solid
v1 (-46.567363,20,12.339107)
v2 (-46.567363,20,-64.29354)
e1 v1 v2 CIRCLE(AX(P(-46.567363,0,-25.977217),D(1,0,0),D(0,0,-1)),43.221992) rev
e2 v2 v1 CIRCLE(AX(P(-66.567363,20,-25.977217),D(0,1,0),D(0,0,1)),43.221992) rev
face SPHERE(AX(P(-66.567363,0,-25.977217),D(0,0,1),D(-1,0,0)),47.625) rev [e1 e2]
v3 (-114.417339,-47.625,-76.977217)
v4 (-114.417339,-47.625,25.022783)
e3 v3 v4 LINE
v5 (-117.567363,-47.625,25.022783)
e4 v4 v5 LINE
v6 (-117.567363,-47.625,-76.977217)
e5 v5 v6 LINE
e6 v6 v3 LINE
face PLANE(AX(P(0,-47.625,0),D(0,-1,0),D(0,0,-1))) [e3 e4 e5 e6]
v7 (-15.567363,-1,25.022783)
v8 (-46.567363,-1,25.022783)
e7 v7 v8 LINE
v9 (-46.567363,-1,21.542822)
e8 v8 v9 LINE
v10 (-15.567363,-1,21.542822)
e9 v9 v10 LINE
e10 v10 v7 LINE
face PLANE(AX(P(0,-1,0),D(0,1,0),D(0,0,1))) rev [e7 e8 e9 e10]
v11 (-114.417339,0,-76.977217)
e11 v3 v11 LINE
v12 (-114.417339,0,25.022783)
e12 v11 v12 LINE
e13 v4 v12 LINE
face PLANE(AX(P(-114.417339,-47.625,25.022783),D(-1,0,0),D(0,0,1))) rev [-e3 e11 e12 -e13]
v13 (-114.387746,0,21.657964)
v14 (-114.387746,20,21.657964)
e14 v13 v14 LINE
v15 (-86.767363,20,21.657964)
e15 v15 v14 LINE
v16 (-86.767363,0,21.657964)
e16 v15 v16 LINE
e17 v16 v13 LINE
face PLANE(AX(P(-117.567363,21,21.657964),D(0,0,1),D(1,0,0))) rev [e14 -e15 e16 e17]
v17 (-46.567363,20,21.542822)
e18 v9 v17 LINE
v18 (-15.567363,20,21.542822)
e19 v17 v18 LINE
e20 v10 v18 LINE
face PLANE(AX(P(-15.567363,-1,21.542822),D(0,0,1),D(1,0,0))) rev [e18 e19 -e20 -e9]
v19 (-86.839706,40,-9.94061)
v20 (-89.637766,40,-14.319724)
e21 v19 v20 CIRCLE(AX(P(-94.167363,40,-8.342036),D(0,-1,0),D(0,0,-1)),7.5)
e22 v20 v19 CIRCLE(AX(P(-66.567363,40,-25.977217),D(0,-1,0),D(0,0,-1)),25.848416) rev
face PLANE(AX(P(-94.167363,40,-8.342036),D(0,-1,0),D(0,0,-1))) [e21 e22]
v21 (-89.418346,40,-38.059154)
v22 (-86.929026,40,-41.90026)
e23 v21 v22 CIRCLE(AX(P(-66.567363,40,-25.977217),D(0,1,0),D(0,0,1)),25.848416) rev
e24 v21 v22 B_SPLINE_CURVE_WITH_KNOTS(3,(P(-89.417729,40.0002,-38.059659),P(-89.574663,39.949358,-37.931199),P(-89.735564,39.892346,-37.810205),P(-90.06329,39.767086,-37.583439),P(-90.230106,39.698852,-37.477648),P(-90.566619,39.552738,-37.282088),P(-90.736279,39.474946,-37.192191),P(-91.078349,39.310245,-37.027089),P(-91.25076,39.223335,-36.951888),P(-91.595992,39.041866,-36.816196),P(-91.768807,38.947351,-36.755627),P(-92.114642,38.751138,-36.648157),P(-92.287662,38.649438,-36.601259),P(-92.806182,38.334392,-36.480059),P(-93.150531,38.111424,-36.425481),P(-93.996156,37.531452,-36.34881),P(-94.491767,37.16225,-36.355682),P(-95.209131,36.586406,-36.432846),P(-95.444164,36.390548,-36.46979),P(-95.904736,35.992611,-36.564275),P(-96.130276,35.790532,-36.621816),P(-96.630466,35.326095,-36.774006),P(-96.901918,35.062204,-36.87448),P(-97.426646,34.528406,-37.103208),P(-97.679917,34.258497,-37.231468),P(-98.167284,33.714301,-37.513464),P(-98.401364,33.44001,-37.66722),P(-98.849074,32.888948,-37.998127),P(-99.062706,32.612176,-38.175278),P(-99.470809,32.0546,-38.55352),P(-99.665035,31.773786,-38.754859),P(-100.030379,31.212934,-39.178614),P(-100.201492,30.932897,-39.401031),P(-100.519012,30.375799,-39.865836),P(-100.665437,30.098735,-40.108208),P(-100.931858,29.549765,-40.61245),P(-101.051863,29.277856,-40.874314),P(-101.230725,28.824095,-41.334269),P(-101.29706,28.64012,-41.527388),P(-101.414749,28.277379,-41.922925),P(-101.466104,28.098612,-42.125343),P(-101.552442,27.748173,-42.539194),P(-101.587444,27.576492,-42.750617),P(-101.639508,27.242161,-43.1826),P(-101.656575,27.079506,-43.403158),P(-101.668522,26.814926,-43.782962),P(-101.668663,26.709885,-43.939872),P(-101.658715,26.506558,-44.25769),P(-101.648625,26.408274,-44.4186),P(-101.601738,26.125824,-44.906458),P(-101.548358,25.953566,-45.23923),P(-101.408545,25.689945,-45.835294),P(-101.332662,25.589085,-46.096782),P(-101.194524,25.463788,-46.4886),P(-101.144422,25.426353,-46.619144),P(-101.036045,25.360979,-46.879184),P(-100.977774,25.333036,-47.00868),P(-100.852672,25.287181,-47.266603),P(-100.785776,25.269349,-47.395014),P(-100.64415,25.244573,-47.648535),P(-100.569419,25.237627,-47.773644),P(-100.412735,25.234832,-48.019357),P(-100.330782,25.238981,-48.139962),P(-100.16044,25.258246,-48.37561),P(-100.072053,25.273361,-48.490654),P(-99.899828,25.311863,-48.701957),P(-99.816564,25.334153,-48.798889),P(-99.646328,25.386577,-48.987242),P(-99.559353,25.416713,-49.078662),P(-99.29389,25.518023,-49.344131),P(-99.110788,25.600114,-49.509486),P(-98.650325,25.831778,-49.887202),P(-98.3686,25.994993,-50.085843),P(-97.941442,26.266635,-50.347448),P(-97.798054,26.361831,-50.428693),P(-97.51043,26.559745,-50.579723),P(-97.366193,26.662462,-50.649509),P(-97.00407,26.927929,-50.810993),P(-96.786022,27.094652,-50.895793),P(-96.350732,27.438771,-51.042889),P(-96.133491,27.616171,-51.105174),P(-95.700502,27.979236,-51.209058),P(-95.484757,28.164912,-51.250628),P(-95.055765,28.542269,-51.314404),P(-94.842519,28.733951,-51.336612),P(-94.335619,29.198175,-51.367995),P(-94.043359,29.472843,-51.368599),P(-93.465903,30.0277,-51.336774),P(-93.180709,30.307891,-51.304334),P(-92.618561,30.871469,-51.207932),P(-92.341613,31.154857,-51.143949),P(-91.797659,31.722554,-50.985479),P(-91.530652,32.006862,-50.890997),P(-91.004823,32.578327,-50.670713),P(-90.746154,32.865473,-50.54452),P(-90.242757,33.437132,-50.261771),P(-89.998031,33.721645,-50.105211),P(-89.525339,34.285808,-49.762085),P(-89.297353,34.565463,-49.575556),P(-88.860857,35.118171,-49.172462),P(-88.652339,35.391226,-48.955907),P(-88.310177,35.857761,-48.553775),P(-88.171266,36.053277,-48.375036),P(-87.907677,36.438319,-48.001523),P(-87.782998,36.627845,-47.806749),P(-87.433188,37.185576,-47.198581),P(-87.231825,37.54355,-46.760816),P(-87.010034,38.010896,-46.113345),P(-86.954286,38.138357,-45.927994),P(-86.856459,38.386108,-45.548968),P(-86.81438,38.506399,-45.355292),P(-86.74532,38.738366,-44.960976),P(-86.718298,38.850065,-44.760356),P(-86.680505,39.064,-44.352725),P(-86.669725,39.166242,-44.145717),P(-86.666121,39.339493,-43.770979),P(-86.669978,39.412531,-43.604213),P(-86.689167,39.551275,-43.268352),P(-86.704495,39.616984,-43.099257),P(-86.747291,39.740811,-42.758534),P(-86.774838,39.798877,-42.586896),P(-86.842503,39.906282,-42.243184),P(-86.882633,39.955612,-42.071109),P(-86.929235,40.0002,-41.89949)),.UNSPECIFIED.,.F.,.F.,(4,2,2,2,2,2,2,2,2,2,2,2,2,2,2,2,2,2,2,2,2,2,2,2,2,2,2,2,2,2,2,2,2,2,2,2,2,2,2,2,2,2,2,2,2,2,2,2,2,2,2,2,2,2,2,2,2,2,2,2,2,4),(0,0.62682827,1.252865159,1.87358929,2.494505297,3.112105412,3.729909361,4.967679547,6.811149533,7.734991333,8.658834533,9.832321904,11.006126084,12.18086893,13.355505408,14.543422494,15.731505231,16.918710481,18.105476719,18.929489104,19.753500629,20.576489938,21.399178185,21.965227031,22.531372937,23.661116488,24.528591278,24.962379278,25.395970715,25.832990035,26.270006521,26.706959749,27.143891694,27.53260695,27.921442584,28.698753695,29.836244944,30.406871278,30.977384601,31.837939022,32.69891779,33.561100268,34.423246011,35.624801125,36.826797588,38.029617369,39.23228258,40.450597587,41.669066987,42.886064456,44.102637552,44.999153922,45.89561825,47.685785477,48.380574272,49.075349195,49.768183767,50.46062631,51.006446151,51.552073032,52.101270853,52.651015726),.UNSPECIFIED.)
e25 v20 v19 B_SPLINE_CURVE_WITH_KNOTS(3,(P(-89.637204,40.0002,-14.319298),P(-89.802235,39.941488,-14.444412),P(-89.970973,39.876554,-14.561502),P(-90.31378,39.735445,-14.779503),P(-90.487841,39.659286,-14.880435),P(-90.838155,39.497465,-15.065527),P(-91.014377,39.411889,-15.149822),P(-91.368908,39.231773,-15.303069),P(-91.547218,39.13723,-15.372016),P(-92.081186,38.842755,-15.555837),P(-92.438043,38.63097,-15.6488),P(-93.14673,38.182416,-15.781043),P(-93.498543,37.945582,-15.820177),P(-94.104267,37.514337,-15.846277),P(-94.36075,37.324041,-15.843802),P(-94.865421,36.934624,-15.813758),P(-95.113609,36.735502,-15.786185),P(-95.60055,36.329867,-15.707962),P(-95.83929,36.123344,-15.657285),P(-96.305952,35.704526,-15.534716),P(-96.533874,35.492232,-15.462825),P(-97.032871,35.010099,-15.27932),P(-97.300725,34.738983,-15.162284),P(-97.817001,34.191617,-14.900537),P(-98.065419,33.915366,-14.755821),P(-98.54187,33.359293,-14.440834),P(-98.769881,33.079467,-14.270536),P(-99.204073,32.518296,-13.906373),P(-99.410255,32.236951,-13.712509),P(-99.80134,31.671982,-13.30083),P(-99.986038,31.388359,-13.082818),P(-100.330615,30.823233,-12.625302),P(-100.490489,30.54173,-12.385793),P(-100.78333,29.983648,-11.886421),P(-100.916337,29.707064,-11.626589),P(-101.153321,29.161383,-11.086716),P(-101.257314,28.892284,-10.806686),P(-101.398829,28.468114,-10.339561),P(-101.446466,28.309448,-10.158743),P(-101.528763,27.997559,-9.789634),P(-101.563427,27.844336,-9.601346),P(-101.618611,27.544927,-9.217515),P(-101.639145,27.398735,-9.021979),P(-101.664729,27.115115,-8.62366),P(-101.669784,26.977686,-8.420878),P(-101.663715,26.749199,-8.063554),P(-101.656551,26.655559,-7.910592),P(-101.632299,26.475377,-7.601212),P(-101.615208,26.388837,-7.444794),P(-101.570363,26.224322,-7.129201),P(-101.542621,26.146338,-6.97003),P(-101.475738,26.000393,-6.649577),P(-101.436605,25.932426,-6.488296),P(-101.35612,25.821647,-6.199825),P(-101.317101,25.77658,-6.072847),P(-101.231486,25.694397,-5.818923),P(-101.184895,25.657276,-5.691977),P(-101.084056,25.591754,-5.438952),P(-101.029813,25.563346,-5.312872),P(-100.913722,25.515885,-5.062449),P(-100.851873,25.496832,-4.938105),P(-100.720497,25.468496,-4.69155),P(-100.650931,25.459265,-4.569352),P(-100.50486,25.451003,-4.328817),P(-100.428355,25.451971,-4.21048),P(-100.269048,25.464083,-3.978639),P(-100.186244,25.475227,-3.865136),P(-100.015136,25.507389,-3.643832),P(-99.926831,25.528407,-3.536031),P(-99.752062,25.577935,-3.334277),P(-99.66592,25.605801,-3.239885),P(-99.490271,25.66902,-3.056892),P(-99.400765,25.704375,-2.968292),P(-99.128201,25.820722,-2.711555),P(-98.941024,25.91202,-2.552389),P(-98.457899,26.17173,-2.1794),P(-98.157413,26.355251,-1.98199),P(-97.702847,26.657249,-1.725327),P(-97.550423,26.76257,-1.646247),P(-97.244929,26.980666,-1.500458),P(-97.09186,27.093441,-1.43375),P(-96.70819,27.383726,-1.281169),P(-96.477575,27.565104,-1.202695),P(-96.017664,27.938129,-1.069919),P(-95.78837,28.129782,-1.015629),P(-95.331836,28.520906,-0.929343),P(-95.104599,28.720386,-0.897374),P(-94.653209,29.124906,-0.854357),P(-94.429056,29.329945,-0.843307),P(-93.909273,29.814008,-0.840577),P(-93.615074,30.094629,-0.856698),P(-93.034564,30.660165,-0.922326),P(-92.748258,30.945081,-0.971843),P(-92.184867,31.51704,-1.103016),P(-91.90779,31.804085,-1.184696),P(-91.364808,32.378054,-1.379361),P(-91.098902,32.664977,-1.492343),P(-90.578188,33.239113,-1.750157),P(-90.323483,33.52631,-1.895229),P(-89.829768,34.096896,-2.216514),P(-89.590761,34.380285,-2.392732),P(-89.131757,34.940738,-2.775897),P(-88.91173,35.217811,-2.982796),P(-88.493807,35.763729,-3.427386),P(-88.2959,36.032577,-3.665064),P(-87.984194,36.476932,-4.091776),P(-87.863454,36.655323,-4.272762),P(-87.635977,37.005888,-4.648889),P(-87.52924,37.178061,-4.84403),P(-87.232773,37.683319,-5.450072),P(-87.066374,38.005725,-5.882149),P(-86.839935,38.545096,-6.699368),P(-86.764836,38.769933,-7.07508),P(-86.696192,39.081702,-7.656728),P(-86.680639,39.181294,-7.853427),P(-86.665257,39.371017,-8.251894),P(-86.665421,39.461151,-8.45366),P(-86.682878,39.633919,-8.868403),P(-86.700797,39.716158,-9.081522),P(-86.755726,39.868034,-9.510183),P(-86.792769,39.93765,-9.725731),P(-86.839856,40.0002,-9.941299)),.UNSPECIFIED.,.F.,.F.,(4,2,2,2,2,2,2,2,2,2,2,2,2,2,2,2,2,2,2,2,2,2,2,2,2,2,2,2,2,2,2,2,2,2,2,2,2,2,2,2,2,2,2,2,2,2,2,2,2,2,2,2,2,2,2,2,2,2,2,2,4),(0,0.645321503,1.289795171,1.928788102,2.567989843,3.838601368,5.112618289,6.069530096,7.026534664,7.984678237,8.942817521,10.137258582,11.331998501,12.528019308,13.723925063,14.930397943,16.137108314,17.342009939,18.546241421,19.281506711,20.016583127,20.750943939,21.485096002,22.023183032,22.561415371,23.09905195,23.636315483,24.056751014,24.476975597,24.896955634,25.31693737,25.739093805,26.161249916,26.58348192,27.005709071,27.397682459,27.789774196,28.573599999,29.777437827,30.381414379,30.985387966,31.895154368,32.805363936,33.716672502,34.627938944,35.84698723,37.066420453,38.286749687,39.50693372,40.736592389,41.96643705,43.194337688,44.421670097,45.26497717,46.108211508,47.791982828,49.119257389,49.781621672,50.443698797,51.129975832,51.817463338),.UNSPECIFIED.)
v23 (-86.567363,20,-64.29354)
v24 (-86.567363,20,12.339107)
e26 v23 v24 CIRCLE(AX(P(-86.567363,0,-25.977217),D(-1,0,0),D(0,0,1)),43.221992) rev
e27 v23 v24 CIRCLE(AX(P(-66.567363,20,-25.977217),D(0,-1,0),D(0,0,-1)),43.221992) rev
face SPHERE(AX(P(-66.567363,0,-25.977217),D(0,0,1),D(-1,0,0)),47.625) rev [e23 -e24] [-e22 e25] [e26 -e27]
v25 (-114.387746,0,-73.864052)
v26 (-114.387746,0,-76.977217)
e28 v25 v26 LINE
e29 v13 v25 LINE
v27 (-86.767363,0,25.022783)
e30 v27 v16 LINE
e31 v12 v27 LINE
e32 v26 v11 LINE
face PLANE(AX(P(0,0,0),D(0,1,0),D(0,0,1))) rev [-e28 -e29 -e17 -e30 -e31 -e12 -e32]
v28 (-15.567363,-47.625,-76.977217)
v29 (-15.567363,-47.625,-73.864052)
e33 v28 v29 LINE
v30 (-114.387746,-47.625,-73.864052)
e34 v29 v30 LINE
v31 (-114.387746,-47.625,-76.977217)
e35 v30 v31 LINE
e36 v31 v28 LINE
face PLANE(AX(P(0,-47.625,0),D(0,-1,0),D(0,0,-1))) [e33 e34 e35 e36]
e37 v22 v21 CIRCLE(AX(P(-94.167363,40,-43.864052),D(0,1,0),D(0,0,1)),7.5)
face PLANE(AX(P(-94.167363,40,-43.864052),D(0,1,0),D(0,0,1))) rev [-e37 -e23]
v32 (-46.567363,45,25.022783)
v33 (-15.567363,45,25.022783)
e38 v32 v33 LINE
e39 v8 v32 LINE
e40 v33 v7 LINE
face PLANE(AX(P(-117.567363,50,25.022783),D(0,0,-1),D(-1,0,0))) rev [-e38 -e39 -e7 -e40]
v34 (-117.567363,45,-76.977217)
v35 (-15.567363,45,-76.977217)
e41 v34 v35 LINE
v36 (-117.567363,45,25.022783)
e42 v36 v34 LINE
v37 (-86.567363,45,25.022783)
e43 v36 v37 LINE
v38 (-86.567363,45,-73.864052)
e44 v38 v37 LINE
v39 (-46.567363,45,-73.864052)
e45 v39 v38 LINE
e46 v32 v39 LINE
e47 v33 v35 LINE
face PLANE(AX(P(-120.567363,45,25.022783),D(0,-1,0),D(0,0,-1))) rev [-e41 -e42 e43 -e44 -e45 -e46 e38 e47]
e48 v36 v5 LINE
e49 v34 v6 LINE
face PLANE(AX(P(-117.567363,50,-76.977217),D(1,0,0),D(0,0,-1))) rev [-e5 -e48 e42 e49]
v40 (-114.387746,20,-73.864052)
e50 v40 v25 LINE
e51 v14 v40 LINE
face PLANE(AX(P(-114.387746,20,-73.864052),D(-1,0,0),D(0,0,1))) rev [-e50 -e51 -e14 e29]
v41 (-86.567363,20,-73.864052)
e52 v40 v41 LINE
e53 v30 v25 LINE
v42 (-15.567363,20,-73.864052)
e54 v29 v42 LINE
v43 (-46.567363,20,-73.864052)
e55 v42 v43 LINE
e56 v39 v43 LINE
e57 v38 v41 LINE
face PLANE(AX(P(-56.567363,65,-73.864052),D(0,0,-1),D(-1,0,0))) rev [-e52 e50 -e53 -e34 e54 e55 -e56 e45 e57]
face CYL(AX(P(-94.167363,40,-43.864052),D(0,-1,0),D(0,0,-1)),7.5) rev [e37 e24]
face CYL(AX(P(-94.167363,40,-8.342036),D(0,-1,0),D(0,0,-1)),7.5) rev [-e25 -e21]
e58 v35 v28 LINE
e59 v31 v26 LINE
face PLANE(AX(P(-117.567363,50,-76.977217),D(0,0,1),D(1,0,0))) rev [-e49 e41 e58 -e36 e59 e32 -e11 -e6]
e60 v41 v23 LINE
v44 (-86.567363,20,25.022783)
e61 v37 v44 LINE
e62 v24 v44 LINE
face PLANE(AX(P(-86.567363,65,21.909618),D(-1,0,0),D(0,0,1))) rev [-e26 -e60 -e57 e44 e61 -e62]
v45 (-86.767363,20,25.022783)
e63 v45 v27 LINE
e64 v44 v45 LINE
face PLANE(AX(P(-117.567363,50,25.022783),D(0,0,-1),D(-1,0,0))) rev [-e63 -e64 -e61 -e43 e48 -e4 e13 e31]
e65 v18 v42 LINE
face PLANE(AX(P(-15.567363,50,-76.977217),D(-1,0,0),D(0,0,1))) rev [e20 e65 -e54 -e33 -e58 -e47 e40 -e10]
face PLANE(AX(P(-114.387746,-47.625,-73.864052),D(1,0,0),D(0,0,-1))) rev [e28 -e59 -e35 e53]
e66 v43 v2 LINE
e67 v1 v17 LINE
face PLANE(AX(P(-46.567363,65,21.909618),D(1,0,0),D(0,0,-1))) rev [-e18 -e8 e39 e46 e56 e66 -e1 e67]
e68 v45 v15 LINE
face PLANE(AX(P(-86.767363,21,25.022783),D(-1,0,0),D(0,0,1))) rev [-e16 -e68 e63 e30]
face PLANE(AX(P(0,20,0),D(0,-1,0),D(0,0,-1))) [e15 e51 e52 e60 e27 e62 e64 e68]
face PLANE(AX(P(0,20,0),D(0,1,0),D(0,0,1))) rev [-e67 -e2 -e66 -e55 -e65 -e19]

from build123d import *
from build123d.topology import SkipClean

# Parameters (mm, degrees)
SKETCH1_W                   = 102
SKETCH1_H                   = 102
BOSS_EXTRUDE1_DEPTH         = 50
CUT_EXTRUDE_THIN1_OUTLINE_W = 40
CUT_EXTRUDE_THIN1_OUTLINE_H = 95.773670058
CUT_EXTRUDE_THIN1_DEPTH     = 50
SKETCH4_W                   = 40
SKETCH4_H                   = 6.202657501
CUT_EXTRUDE3_DEPTH          = 54
SKETCH5_W                   = 33.817621941
SKETCH5_H                   = 102.594578927
CUT_EXTRUDE4_DEPTH          = 20
SKETCH6_W                   = 27.820383201
SKETCH6_H                   = 98.886835029
CUT_EXTRUDE5_DEPTH          = 20
SKETCH7_W                   = 30.8
SKETCH7_H                   = 3.364819678
BOSS_EXTRUDE2_DEPTH         = 21
SKETCH9_W                   = 31
SKETCH9_H                   = 3.479961613
BOSS_EXTRUDE4_DEPTH         = 21
SKETCH10_W                  = 3.15002448
SKETCH10_H                  = 102
BOSS_EXTRUDE5_DEPTH         = 47.625
SKETCH11_W                  = 98.820383201
SKETCH11_H                  = 3.113164971
BOSS_EXTRUDE6_DEPTH         = 47.625
SKETCH14_W                  = 102
SKETCH14_H                  = 5
CUT_EXTRUDE7_DEPTH          = 105
SKETCH13_R                  = 7.5
CUT_EXTRUDE8_DEPTH          = 20
SKETCH13_4_R                = 7.5
CUT_EXTRUDE9_DEPTH          = 20


# Read off the part's stored shape, not the designer's step: Cut-Extrude-Thin1
with BuildPart() as part:
    # Sketch1 → Boss-Extrude1 (new body)
    with BuildSketch(Plane(origin=(0, 0, 0), x_dir=(1, 0, 0), z_dir=(0, 1, 0))):
        with Locations((-66.567363259, 25.977216604)):
            Rectangle(SKETCH1_W, SKETCH1_H)
    extrude(amount=BOSS_EXTRUDE1_DEPTH)

    # Sketch2 → Cut-Revolve1 (revolve, cut)
    with SkipClean():  # the faces are left unmerged after this step: merging them gives an invalid solid
        with BuildSketch(Plane(origin=(0, 0, 0), x_dir=(1, 0, 0), z_dir=(0, 1, 0))):
            with BuildLine():
                ThreePointArc((-66.567363259, 73.602216604), (-114.192363259, 25.977216604), (-66.567363259, -21.647783396))
                Line((-66.567363259, -21.647783396), (-66.567363259, 73.602216604))
            make_face()
            with BuildLine():
                Line((-66.567363259, 73.602216604), (-66.567363259, -21.647783396))
                ThreePointArc((-66.567363259, -21.647783396), (-32.891402805, -7.69874385), (-18.942363259, 25.977216604))
                ThreePointArc((-18.942363259, 25.977216604), (-32.891402805, 59.653177058), (-66.567363259, 73.602216604))
            make_face()
        revolve(axis=Axis((-66.567363259, 0, 21.647783396), (0, 0, -1)), mode=Mode.SUBTRACT)
    add(part.part.scale(1), mode=Mode.REPLACE)  # the faces are merged on a copy

    # Cut-Extrude-Thin1 outline → Cut-Extrude-Thin1 (cut)
    with BuildSketch(Plane(origin=(0, 0, 0), x_dir=(1, 0, 0), z_dir=(0, 1, 0))):
        with Locations((-66.567363259, 25.977216604)):
            Rectangle(CUT_EXTRUDE_THIN1_OUTLINE_W, CUT_EXTRUDE_THIN1_OUTLINE_H)
    extrude(amount=CUT_EXTRUDE_THIN1_DEPTH, mode=Mode.SUBTRACT)

    # Sketch4 → Cut-Extrude3 (cut)
    with BuildSketch(Plane(origin=(0, 0, 0), x_dir=(1, 0, 0), z_dir=(0, 1, 0))):
        with Locations((-66.567363259, -25.010947176)):
            Rectangle(SKETCH4_W, SKETCH4_H)
    extrude(amount=CUT_EXTRUDE3_DEPTH, mode=Mode.SUBTRACT)

    # Sketch5 → Cut-Extrude4 (cut)
    with BuildSketch(Plane(origin=(0, 0, 0), x_dir=(1, 0, 0), z_dir=(0, 1, 0))):
        with Locations((-29.658552289, 22.56676217)):
            Rectangle(SKETCH5_W, SKETCH5_H)
    extrude(amount=CUT_EXTRUDE4_DEPTH, mode=Mode.SUBTRACT)

    # Sketch6 → Cut-Extrude5 (cut)
    with BuildSketch(Plane(origin=(0, 0, 0), x_dir=(-1, 0, 0), z_dir=(0, -1, 0))):
        with Locations((100.47755486, 24.420634119)):
            Rectangle(SKETCH6_W, SKETCH6_H)
    extrude(amount=-CUT_EXTRUDE5_DEPTH, mode=Mode.SUBTRACT)

    # Sketch7 → Boss-Extrude2 (add)
    with BuildSketch(Plane(origin=(0, 0, 0), x_dir=(1, 0, 0), z_dir=(0, 1, 0))):
        with Locations((-102.167363259, -23.340373557)):
            Rectangle(SKETCH7_W, SKETCH7_H)
    extrude(amount=BOSS_EXTRUDE2_DEPTH)

    # Sketch9 → Boss-Extrude4 (add)
    with BuildSketch(Plane.XZ.offset(-20)):
        with Locations((-31.067363259, 23.28280259)):
            Rectangle(SKETCH9_W, SKETCH9_H)
    extrude(amount=BOSS_EXTRUDE4_DEPTH)

    # Sketch10 → Boss-Extrude5 (add)
    with BuildSketch(Plane.XZ):
        with Locations((-115.992351019, -25.977216604)):
            Rectangle(SKETCH10_W, SKETCH10_H)
    extrude(amount=BOSS_EXTRUDE5_DEPTH)

    # Sketch11 → Boss-Extrude6 (add)
    with BuildSketch(Plane.XZ):
        with Locations((-64.97755486, -75.420634119)):
            Rectangle(SKETCH11_W, SKETCH11_H)
    extrude(amount=BOSS_EXTRUDE6_DEPTH)

    # Sketch14 → Cut-Extrude7 (cut)
    with BuildSketch(Plane(origin=(-15.567363259, 0, 0), x_dir=(0, 0, -1), z_dir=(1, 0, 0))):
        with Locations((25.977216604, 47.5)):
            Rectangle(SKETCH14_W, SKETCH14_H)
    extrude(amount=-CUT_EXTRUDE7_DEPTH, mode=Mode.SUBTRACT)

    # Sketch13 → Cut-Extrude8 (cut)
    with BuildSketch(Plane.XZ.offset(-20)):
        with Locations((-94.167363259, -8.342036282)):
            Circle(SKETCH13_R)
    extrude(amount=-CUT_EXTRUDE8_DEPTH, mode=Mode.SUBTRACT)

    # Sketch13<4> → Cut-Extrude9 (cut)
    with BuildSketch(Plane.XZ.offset(-20)):
        with Locations((-94.167363259, -43.864051633)):
            Circle(SKETCH13_4_R)
    extrude(amount=-CUT_EXTRUDE9_DEPTH, mode=Mode.SUBTRACT)


solid = part.part
